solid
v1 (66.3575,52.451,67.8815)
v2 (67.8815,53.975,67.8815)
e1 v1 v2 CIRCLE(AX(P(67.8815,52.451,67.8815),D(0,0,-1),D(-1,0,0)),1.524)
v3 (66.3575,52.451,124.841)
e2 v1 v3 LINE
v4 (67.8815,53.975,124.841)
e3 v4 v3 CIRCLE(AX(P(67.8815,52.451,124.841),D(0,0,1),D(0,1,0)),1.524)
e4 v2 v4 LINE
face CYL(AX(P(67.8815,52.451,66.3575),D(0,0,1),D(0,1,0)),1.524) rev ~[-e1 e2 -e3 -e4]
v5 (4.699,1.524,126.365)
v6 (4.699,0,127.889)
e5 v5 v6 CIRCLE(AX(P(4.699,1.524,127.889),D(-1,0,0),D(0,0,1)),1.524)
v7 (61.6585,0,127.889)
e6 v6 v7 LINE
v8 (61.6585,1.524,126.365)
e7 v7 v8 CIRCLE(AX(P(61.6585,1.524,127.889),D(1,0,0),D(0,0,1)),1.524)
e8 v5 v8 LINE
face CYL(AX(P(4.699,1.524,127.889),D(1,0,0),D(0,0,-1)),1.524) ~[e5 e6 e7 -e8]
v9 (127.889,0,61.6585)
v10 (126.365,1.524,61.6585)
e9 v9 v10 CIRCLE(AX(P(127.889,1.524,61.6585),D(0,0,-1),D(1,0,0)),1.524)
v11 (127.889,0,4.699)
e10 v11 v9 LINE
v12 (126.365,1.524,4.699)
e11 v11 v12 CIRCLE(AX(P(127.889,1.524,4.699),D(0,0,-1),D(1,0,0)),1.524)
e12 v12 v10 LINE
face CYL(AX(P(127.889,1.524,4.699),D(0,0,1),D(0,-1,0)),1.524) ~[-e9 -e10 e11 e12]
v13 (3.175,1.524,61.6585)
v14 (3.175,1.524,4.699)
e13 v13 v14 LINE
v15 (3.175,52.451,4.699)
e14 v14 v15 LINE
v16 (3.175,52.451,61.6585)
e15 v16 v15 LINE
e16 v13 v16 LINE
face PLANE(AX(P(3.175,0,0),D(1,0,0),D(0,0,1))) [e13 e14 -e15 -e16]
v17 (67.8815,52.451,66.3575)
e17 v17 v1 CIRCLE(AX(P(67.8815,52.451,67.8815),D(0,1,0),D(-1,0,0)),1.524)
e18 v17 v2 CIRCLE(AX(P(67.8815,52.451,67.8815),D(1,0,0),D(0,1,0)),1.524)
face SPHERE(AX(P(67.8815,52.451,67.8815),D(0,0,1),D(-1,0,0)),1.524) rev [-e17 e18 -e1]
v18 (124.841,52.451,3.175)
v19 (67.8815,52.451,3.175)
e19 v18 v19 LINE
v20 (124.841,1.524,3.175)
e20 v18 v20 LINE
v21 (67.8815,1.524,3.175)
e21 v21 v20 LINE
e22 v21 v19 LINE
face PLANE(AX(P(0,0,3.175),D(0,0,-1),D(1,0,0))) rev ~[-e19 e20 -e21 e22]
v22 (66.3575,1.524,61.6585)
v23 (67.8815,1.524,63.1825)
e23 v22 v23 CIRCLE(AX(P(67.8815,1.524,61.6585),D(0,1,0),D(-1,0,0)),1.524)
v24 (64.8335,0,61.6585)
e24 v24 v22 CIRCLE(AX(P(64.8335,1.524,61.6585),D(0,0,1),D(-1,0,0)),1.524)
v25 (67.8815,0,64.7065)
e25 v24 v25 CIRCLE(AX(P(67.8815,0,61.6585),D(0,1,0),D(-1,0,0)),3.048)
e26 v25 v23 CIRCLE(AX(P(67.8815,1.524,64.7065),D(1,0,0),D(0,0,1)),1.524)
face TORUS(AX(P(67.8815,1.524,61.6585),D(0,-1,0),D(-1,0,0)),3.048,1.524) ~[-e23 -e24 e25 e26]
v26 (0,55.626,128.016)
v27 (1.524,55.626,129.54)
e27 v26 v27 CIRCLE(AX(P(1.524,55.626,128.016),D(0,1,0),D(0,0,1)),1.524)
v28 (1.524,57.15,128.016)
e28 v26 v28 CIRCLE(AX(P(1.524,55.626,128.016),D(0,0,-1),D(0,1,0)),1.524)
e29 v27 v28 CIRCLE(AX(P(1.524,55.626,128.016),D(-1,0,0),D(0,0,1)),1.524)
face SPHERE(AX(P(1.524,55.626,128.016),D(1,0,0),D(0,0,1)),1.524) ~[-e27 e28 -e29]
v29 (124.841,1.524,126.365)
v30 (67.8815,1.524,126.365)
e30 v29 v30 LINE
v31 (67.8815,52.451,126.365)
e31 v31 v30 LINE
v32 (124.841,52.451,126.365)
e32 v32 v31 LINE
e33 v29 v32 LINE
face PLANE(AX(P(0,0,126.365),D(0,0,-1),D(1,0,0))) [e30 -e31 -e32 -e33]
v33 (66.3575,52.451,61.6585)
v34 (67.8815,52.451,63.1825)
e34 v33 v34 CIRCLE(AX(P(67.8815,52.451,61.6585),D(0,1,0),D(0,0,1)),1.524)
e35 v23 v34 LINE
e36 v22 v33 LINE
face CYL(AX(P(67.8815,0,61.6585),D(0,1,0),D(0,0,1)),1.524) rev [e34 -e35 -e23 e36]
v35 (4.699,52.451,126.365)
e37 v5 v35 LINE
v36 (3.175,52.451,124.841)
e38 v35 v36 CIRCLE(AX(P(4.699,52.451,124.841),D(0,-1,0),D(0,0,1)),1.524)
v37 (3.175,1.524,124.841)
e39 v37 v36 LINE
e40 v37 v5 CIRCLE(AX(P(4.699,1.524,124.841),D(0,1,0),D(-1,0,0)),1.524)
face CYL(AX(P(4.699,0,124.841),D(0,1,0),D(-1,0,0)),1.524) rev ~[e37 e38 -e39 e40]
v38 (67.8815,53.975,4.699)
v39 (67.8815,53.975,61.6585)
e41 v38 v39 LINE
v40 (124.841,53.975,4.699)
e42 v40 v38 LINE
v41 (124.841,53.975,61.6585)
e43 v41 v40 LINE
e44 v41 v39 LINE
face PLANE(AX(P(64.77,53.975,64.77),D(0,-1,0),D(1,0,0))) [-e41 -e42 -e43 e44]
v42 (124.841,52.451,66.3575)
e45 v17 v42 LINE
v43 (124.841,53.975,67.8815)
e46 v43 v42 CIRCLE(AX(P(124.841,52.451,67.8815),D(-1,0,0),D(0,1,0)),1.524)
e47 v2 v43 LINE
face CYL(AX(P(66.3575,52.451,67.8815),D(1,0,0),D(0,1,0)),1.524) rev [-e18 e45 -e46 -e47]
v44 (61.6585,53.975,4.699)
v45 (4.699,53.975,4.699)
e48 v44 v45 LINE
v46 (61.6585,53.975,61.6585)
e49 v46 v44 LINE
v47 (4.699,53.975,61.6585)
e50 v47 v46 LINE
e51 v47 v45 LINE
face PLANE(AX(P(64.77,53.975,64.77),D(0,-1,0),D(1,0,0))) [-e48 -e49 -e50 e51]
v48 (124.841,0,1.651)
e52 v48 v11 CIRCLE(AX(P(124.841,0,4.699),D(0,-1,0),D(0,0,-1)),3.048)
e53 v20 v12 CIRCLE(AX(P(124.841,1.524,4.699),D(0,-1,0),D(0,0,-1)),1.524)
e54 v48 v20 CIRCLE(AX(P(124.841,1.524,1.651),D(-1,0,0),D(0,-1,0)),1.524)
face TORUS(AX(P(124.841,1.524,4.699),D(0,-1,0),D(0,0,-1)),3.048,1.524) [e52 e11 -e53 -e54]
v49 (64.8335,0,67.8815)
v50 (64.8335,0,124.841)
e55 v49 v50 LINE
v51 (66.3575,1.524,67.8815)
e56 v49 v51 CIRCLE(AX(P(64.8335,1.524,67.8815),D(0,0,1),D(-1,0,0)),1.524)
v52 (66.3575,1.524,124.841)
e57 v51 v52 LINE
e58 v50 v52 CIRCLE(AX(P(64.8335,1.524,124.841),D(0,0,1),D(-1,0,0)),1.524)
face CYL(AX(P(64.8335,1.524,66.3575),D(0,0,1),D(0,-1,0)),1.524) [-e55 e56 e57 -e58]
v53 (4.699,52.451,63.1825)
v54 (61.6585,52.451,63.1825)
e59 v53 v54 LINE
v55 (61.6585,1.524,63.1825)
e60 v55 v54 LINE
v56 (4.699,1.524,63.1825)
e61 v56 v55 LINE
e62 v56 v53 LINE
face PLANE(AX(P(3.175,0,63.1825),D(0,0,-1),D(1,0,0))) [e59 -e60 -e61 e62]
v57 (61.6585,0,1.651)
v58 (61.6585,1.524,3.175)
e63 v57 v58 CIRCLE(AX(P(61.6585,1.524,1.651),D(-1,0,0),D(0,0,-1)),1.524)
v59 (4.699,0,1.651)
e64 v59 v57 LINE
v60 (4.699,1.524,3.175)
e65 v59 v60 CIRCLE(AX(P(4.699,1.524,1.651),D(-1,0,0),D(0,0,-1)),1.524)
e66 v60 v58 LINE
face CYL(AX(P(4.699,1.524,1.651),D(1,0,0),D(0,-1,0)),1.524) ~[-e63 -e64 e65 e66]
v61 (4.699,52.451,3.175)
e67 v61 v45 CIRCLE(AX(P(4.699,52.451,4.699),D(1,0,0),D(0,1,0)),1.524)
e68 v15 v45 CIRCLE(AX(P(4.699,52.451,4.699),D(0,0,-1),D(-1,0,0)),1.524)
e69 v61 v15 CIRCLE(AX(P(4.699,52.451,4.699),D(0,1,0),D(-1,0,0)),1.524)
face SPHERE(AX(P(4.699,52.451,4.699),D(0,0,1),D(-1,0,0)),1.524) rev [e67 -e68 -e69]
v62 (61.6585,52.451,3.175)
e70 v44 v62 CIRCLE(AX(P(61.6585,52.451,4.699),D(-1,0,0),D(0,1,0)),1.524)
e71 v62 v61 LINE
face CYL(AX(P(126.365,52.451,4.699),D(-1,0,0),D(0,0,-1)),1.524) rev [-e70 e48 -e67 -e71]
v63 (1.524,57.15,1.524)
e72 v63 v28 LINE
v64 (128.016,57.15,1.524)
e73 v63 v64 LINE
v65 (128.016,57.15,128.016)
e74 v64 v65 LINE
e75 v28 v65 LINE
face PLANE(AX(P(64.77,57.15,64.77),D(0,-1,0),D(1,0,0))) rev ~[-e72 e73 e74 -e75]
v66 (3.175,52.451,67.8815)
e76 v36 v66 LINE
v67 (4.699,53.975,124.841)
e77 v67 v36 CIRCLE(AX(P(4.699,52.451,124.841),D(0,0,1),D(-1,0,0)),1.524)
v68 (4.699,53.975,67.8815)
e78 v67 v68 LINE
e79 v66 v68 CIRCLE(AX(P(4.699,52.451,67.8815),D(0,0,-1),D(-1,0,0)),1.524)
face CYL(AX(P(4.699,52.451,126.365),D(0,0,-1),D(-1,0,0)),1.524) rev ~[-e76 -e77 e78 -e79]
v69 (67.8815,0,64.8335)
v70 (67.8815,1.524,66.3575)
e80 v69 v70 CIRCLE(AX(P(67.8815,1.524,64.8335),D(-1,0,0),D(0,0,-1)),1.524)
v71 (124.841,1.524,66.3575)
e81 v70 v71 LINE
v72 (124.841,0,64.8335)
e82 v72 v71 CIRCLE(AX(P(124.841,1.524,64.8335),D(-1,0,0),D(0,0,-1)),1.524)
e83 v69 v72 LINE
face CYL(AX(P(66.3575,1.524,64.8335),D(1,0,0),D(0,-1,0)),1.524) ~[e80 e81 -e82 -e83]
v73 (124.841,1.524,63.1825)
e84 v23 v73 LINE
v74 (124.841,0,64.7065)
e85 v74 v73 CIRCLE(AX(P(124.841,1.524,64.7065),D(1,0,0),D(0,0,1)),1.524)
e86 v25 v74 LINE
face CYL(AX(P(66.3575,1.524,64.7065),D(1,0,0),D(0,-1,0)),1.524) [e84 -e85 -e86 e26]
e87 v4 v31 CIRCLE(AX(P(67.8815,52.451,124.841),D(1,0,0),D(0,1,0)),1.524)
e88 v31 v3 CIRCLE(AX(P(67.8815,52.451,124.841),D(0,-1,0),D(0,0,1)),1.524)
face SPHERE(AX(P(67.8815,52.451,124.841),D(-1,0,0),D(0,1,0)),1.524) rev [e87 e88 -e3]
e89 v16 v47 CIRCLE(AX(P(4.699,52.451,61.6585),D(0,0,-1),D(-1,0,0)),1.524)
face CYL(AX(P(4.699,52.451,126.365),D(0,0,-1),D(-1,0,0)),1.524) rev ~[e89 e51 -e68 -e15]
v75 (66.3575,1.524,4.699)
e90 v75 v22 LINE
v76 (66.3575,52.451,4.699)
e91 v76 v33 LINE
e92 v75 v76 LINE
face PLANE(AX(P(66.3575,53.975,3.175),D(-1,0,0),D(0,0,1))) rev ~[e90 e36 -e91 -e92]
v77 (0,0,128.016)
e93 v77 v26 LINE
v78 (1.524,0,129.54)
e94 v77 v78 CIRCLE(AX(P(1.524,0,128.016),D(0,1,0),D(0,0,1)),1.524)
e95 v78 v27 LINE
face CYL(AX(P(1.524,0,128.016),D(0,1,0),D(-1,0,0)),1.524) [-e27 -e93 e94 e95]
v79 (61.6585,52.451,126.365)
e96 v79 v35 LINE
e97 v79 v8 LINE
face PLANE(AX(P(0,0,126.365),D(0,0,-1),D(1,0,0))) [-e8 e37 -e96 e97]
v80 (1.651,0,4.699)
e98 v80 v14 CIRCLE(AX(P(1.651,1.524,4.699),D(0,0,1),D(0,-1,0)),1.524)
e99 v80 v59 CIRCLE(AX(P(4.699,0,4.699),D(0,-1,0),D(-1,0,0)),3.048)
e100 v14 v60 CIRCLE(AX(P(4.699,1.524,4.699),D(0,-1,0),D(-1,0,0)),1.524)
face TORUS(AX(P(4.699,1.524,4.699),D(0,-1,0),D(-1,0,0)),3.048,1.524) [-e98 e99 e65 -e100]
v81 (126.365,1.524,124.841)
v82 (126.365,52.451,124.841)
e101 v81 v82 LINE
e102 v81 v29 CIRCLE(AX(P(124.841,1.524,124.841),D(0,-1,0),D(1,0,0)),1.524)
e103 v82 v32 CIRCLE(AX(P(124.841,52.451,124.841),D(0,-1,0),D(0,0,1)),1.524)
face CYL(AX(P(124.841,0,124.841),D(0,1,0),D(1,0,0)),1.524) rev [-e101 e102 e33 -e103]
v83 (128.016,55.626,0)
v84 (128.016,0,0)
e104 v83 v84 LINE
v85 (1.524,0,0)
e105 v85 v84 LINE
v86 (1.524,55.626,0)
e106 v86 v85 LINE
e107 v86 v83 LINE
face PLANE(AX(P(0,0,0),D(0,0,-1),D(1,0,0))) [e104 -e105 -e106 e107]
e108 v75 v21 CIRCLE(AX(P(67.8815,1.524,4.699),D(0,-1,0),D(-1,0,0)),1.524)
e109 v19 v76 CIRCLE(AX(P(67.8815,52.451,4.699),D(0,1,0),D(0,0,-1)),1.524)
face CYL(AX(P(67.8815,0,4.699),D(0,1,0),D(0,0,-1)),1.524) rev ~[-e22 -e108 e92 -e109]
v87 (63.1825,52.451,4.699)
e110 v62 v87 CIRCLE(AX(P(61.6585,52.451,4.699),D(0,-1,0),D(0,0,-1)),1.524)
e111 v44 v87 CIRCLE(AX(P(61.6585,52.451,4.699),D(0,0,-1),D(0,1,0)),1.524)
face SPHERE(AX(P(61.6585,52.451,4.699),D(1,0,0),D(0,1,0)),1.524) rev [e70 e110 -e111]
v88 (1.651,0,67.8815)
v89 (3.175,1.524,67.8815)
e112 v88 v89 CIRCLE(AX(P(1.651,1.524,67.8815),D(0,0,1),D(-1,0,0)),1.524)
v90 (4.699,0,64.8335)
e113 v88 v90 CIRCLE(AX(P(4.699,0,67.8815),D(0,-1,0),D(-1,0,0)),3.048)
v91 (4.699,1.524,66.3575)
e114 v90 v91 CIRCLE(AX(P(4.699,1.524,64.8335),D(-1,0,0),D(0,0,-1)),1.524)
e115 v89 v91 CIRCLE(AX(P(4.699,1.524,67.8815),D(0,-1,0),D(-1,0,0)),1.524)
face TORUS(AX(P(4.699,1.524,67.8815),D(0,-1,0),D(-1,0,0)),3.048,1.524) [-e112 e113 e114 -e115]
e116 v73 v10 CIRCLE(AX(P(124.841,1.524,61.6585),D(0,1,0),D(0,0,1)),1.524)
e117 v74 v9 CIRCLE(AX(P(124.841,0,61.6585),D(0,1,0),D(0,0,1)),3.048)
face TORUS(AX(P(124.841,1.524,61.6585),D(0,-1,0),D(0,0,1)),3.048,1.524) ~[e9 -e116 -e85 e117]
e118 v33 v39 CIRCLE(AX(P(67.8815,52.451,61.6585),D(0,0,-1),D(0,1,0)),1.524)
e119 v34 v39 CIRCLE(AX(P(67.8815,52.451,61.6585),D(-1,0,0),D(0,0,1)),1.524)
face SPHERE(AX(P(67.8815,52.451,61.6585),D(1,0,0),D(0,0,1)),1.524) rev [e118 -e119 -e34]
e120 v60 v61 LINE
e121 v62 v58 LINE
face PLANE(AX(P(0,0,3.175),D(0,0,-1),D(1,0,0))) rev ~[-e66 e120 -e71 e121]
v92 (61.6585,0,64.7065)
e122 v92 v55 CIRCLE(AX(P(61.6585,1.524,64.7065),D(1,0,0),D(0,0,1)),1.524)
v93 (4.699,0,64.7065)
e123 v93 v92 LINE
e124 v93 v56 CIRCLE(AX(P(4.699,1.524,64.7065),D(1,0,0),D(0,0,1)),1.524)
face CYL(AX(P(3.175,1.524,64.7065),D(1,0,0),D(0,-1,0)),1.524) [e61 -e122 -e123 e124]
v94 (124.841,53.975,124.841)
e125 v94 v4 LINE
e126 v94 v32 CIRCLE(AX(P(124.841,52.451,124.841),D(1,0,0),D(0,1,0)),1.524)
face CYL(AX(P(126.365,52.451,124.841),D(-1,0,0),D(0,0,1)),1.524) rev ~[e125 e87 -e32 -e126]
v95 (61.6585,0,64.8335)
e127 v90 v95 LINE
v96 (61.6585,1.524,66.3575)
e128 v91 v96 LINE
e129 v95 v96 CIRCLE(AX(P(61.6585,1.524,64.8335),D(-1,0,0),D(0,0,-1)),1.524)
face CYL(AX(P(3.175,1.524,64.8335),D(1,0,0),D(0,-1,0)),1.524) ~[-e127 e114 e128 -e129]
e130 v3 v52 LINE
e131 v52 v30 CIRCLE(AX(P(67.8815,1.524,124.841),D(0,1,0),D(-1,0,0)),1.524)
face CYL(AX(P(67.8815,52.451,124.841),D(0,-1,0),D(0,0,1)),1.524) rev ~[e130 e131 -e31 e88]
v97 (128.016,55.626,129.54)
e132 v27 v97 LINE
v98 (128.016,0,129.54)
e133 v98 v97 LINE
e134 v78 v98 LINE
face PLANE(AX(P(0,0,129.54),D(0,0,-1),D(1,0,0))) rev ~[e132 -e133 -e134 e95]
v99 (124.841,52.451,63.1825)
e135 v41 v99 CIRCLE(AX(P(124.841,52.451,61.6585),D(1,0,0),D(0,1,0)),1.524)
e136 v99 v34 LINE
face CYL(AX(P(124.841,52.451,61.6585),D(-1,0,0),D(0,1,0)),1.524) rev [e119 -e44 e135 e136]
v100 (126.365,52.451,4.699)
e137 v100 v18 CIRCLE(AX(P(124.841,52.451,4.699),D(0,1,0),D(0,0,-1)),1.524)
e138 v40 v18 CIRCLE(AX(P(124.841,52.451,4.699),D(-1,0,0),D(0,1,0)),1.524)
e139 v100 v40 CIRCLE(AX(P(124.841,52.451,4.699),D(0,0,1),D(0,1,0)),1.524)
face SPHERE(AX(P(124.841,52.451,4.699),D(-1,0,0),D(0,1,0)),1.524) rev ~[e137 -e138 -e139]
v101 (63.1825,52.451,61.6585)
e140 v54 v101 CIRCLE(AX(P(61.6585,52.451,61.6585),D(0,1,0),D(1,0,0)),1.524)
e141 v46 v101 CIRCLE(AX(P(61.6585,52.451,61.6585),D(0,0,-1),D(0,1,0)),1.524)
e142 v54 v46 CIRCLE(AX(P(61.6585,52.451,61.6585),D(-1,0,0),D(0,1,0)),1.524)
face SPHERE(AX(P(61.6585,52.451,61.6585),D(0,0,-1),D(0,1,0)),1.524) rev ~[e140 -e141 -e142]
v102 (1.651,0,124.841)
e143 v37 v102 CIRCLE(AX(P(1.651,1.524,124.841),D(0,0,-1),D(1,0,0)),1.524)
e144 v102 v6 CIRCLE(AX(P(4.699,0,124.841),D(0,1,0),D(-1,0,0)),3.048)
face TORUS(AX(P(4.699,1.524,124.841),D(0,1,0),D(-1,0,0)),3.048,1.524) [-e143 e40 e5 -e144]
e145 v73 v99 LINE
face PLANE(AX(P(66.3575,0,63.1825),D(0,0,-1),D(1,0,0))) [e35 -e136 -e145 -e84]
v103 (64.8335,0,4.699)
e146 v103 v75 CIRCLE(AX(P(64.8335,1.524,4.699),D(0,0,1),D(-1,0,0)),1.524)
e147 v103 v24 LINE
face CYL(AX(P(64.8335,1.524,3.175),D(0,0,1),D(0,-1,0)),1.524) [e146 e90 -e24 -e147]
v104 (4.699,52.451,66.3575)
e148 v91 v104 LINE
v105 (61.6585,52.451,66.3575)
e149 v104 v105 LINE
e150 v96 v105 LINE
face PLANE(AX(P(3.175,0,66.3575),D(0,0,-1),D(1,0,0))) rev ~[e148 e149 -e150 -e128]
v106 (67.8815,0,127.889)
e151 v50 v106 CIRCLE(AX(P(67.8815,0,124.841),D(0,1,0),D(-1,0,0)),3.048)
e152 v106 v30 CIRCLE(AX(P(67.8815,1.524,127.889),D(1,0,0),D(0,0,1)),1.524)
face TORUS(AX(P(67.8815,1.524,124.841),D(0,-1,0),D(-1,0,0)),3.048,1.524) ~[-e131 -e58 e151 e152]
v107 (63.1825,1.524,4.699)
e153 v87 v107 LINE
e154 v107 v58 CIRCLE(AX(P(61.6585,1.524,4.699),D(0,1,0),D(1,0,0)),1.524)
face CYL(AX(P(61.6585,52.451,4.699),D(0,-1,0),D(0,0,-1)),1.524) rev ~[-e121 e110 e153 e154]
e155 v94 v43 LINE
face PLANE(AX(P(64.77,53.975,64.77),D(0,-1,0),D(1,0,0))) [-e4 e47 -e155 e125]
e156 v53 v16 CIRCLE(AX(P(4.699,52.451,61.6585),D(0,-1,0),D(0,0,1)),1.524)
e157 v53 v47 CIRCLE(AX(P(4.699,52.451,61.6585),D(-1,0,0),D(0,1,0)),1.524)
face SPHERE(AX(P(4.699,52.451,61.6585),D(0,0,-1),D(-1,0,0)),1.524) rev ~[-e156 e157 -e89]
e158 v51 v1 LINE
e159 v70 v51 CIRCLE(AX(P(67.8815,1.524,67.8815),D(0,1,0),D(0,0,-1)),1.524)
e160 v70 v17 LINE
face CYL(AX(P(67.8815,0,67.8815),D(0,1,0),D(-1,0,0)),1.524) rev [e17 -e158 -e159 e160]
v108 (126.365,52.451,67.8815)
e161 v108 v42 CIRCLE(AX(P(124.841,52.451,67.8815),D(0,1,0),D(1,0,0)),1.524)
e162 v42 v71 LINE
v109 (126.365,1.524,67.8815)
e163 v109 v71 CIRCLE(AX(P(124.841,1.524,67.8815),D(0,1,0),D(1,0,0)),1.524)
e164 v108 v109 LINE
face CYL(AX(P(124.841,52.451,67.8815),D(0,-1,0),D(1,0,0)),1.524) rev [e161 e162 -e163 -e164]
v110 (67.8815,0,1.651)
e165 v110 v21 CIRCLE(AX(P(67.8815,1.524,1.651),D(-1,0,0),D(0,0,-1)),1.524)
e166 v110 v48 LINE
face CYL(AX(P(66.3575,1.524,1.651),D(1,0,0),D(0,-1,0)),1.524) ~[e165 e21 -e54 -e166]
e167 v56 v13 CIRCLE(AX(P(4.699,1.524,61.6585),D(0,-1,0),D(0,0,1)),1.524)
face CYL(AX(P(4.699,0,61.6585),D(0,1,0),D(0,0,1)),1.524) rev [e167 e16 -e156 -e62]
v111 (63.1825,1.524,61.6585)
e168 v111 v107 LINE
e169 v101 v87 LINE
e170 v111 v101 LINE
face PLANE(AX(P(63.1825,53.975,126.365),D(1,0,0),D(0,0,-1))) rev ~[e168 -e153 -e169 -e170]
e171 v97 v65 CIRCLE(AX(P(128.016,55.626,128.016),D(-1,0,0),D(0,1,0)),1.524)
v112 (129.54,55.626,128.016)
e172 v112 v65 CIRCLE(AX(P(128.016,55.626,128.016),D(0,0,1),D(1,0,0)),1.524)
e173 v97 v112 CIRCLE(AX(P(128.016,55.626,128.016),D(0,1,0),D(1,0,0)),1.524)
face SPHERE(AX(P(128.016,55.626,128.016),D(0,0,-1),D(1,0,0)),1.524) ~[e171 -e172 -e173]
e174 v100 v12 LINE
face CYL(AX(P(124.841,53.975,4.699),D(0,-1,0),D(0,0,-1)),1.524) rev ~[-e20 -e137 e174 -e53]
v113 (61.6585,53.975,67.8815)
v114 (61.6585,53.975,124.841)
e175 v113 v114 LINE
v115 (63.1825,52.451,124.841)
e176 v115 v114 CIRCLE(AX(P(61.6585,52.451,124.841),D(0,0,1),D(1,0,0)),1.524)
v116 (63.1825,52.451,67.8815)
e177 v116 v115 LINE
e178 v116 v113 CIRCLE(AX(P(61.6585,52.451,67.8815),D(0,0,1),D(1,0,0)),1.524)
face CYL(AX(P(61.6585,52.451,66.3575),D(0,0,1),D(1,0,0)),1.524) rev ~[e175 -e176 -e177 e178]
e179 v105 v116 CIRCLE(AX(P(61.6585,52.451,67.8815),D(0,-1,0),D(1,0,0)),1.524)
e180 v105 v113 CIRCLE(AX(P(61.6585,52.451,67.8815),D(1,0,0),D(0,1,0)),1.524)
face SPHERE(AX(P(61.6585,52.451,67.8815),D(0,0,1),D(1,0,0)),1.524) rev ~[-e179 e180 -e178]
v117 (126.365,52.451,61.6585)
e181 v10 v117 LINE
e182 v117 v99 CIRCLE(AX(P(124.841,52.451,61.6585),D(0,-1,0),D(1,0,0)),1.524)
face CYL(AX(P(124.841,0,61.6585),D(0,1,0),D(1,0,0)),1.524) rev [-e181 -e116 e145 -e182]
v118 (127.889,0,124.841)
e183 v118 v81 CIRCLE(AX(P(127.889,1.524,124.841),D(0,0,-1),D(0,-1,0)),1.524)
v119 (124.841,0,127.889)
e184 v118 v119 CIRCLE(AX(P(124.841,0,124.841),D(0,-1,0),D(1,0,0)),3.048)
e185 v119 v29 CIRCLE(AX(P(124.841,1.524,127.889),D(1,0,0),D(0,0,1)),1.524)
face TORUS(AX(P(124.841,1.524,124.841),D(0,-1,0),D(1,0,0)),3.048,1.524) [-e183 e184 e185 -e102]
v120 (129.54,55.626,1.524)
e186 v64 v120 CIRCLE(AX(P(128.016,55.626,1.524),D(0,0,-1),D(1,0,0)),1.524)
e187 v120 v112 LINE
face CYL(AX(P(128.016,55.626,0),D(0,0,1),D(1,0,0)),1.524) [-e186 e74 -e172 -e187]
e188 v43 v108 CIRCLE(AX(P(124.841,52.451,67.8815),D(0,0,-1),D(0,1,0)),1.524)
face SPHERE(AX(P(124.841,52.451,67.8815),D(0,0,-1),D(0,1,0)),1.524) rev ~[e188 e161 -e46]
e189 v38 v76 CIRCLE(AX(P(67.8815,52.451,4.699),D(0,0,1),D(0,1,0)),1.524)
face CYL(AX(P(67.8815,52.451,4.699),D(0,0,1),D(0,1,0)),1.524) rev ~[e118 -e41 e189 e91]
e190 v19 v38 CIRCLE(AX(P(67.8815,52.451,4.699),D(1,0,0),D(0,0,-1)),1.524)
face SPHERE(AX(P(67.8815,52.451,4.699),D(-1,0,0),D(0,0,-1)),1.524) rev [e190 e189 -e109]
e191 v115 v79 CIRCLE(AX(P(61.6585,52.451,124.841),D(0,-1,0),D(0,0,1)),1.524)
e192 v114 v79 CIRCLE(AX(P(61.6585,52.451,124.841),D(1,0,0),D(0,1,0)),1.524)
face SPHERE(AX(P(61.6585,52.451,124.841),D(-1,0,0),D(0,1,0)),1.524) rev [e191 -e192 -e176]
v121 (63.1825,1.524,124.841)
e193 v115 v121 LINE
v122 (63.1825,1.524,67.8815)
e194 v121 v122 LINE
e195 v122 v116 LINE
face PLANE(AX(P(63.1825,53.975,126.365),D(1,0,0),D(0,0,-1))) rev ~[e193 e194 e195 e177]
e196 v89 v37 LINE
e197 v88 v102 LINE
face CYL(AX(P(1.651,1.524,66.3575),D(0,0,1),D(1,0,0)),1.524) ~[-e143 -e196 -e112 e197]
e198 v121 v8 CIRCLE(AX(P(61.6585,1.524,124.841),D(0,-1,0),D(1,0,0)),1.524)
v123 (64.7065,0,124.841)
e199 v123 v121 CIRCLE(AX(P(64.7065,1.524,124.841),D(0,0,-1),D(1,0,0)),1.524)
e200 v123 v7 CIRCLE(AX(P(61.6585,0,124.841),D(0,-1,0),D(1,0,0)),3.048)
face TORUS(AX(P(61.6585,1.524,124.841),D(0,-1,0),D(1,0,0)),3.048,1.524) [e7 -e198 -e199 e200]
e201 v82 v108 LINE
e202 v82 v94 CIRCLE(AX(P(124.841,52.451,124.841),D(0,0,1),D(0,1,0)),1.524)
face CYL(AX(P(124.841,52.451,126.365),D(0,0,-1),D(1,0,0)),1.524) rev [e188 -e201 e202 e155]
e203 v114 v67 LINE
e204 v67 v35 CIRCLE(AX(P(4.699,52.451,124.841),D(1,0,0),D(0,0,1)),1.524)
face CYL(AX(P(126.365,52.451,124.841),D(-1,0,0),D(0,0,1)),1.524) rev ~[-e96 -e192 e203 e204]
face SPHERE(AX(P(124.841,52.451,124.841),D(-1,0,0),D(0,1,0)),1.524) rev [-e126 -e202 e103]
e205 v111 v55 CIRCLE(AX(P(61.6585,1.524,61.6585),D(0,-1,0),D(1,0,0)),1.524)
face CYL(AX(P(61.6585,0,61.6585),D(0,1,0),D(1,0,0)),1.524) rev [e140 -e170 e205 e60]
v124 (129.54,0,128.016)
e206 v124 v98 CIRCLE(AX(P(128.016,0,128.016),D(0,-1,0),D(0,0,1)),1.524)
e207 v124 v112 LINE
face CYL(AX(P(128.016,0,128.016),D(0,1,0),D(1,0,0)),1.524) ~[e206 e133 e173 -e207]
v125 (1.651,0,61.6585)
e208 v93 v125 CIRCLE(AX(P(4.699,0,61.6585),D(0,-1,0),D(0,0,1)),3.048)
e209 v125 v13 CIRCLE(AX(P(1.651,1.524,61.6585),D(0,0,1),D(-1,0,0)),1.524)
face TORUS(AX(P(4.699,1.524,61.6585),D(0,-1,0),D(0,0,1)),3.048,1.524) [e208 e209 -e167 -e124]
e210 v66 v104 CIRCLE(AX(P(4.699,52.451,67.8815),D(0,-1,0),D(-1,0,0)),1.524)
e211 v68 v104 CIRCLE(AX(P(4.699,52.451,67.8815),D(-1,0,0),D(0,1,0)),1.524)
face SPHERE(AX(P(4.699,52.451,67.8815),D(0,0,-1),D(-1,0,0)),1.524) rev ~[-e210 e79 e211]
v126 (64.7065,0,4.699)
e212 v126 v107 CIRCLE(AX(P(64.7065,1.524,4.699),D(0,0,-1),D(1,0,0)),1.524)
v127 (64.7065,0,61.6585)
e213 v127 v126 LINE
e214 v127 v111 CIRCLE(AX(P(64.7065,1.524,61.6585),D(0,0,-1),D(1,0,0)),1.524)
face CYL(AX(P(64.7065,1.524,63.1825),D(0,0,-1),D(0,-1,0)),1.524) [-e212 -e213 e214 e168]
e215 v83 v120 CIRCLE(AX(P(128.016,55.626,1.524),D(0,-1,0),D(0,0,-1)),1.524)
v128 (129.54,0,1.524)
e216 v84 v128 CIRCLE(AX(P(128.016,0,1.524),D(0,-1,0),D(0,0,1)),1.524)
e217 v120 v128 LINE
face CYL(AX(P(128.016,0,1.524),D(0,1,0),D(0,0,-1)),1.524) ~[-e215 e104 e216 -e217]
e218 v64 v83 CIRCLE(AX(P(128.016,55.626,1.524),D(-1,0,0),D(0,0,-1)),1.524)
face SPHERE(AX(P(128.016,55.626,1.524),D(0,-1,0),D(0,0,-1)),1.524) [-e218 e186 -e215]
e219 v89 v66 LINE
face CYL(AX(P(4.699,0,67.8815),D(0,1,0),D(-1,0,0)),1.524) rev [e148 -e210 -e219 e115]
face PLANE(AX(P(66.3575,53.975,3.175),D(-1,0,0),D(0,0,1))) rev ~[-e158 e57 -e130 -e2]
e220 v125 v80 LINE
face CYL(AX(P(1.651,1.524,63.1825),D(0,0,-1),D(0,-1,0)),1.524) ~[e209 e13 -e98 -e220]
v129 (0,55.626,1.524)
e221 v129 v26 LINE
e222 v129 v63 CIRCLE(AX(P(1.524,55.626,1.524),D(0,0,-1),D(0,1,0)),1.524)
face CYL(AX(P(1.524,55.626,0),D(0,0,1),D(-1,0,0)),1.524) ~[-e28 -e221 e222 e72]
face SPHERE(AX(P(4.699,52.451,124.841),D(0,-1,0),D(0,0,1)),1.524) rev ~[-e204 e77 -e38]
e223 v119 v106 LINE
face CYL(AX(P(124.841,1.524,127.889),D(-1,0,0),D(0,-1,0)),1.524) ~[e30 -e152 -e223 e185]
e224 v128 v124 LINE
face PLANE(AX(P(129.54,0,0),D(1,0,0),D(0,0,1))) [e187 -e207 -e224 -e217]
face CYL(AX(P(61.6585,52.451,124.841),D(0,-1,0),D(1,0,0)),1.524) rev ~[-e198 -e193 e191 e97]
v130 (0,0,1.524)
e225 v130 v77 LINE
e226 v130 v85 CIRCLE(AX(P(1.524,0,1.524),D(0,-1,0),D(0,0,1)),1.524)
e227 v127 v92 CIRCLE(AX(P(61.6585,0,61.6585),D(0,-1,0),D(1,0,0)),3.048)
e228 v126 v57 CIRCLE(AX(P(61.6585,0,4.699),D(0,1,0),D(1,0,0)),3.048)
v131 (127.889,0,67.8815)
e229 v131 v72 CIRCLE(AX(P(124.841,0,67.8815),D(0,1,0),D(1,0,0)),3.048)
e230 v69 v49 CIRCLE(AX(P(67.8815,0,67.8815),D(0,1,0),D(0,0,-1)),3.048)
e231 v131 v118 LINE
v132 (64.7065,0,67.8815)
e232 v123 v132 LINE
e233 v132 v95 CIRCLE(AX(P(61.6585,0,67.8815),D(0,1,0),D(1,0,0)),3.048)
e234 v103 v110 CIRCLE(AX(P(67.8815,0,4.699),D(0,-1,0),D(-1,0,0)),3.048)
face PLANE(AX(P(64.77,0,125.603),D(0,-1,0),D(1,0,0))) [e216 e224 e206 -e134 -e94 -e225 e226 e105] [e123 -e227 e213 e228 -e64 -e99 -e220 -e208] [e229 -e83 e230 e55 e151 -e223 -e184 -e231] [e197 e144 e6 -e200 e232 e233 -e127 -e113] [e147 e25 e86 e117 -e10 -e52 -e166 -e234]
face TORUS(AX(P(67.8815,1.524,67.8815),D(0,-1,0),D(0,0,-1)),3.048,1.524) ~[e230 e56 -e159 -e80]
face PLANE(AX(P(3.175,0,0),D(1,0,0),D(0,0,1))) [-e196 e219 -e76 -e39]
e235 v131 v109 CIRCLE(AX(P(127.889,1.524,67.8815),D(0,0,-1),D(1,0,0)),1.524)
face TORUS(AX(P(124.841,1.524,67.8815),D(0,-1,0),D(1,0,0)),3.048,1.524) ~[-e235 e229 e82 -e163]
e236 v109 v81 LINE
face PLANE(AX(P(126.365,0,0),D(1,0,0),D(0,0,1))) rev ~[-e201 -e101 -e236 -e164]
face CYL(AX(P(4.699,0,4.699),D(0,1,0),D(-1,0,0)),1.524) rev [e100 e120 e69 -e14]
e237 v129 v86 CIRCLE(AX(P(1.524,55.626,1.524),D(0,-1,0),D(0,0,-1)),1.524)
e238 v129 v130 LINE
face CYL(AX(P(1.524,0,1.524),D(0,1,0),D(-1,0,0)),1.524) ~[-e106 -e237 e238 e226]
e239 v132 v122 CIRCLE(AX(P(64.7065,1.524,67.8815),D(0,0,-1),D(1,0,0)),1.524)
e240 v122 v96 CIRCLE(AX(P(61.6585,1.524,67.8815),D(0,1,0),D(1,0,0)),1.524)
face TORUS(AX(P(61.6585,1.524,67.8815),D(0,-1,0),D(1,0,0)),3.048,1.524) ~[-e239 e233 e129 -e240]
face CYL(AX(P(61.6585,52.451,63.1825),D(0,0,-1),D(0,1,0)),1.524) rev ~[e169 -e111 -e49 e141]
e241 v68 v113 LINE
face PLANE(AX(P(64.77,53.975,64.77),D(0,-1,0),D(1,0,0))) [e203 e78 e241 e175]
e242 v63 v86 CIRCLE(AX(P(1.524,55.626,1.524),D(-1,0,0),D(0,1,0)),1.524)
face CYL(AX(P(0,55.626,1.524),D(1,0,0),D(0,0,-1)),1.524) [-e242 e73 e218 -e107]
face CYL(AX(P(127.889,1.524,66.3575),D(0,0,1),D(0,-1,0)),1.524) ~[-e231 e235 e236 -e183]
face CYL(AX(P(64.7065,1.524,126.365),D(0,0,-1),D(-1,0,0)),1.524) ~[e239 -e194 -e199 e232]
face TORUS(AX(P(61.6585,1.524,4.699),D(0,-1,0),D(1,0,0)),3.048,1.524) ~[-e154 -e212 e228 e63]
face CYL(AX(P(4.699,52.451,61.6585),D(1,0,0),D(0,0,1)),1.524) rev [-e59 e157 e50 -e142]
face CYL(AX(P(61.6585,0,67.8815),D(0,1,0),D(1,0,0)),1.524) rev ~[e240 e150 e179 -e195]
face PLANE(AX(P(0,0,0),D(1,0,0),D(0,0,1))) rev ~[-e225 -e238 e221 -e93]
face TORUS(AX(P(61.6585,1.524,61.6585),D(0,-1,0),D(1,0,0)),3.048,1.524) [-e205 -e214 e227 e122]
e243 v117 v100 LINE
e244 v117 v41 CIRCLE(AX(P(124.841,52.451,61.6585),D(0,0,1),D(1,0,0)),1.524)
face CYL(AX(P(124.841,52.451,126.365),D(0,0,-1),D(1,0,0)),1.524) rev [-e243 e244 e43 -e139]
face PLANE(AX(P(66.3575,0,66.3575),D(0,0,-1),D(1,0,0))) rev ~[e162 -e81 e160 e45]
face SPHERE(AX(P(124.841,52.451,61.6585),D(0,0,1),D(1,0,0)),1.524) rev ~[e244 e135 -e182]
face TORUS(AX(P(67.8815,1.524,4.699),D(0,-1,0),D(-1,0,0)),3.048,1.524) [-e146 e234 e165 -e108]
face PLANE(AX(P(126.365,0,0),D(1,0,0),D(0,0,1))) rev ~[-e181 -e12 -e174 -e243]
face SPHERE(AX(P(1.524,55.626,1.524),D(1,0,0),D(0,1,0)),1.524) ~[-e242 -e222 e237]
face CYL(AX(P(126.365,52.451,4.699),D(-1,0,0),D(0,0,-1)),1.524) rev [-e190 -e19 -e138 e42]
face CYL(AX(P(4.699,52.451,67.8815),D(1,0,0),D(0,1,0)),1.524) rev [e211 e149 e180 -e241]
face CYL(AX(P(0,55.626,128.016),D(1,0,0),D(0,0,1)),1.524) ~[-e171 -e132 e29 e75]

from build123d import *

# Parameters (mm, degrees)
F0_W     = 129.54
F0_H     = 129.54
F1_DEPTH = 57.15
F2_T     = -3.175
F3_R     = 1.524
F4_R     = 1.524
F5_W     = 3.175
F5_H     = 1.524
F5_H_2   = 120.142
F6_DEPTH = 53.975
F7_W     = 60.0075
F7_H     = 3.175
F8_DEPTH = 53.975
F9_R     = 1.524


with BuildPart() as f1:
    # F0 (on Front) → F1 (new body)
    with BuildSketch(Plane.XZ):
        with Locations((64.77, 64.77)):
            Rectangle(F0_W, F0_H)
    extrude(amount=-F1_DEPTH)

    # F2
    f2_openings = [f1.faces().sort_by_distance(p)[0] for p in [
        (64.77, 0, 64.77),
    ]]
    offset(amount=F2_T, openings=f2_openings)

    # F3
    f3_edges = [f1.edges().sort_by_distance(p)[0] for p in [
        (3.175, 26.9875, 126.365),
        (64.77, 53.975, 126.365),
        (3.175, 53.975, 64.77),
        (3.175, 26.9875, 3.175),
        (64.77, 53.975, 3.175),
        (126.365, 53.975, 64.77),
        (126.365, 26.9875, 126.365),
        (126.365, 26.9875, 3.175),
    ]]
    fillet(f3_edges, radius=F3_R)

    # F4
    f4_edges = [f1.edges().sort_by_distance(p)[0] for p in [
        (129.54, 28.575, 0),
        (64.77, 57.15, 0),
        (129.54, 57.15, 64.77),
        (129.54, 28.575, 129.54),
        (64.77, 57.15, 129.54),
        (0, 28.575, 129.54),
        (0, 57.15, 64.77),
        (0, 28.575, 0),
    ]]
    fillet(f4_edges, radius=F4_R)

    # F5 (on face) → F6 (join)
    with BuildSketch(Plane.XZ.offset(-53.975)):
        with Locations((64.77, 125.603)):
            Rectangle(F5_W, F5_H)
        with Locations((64.77, 64.77)):
            Rectangle(F5_W, F5_H_2)
        with Locations((64.77, 3.937)):
            Rectangle(F5_W, F5_H)
    extrude(amount=F6_DEPTH)

    # F7 (on face) → F8 (join)
    with BuildSketch(Plane.XZ):
        with BuildLine():
            ThreePointArc((1.524, 129.54), (0.4463692655, 129.0936307345), (0, 128.016))
            Line((0, 128.016), (0, 1.524))
            ThreePointArc((0, 1.524), (0.4463692655, 0.4463692655), (1.524, 0))
            Line((1.524, 0), (128.016, 0))
            ThreePointArc((128.016, 0), (129.0936307345, 0.4463692655), (129.54, 1.524))
            Line((129.54, 1.524), (129.54, 128.016))
            ThreePointArc((129.54, 128.016), (129.0936307345, 129.0936307345), (128.016, 129.54))
            Line((128.016, 129.54), (1.524, 129.54))
        make_face()
        with BuildLine():
            Line((3.175, 4.699), (3.175, 63.1825))
            Line((3.175, 63.1825), (3.175, 66.3575))
            Line((3.175, 66.3575), (3.175, 124.841))
            ThreePointArc((3.175, 124.841), (3.6213692655, 125.9186307345), (4.699, 126.365))
            Line((4.699, 126.365), (63.1825, 126.365))
            Line((63.1825, 126.365), (63.1825, 66.3575))
            Line((63.1825, 66.3575), (66.3575, 66.3575))
            Line((66.3575, 66.3575), (66.3575, 126.365))
            Line((66.3575, 126.365), (124.841, 126.365))
            ThreePointArc((124.841, 126.365), (125.9186307345, 125.9186307345), (126.365, 124.841))
            Line((126.365, 124.841), (126.365, 66.3575))
            Line((126.365, 66.3575), (126.365, 63.1825))
            Line((126.365, 63.1825), (126.365, 4.699))
            ThreePointArc((126.365, 4.699), (125.9186307345, 3.6213692655), (124.841, 3.175))
            Line((124.841, 3.175), (66.3575, 3.175))
            Line((66.3575, 3.175), (66.3575, 63.1825))
            Line((66.3575, 63.1825), (63.1825, 63.1825))
            Line((63.1825, 63.1825), (63.1825, 3.175))
            Line((63.1825, 3.175), (4.699, 3.175))
            ThreePointArc((4.699, 3.175), (3.6213692655, 3.6213692655), (3.175, 4.699))
        make_face(mode=Mode.SUBTRACT)
        with Locations((33.17875, 64.77)):
            Rectangle(F7_W, F7_H)
        with Locations((96.36125, 64.77)):
            Rectangle(F7_W, F7_H)
    extrude(amount=-F8_DEPTH)

    # F9
    f9_edges = [f1.edges().sort_by_distance(p)[0] for p in [
        (66.3575, 53.975, 95.59925),
        (66.3575, 53.528631, 125.918631),
        (66.3575, 26.2255, 126.365),
        (66.3575, 0, 96.36125),
        (66.3575, 26.9875, 66.3575),
        (96.36125, 0, 66.3575),
        (95.59925, 53.975, 66.3575),
        (125.918631, 53.528631, 66.3575),
        (126.365, 26.2255, 66.3575),
        (126.365, 0, 95.59925),
        (126.365, 26.2255, 124.841),
        (126.365, 52.451, 95.59925),
        (126.365, 0, 33.94075),
        (126.365, 26.2255, 63.1825),
        (126.365, 52.451, 33.94075),
        (126.365, 26.2255, 4.699),
        (96.36125, 0, 63.1825),
        (125.918631, 53.528631, 63.1825),
        (95.59925, 53.975, 63.1825),
        (66.3575, 26.9875, 63.1825),
        (66.3575, 53.975, 33.94075),
        (66.3575, 0, 33.17875),
        (66.3575, 26.2255, 3.175),
        (66.3575, 53.528631, 3.621369),
        (95.59925, 0, 3.175),
        (124.841, 26.2255, 3.175),
        (95.59925, 52.451, 3.175),
        (33.94075, 0, 3.175),
        (63.1825, 26.2255, 3.175),
        (33.94075, 52.451, 3.175),
        (4.699, 26.2255, 3.175),
        (3.175, 0, 33.94075),
        (3.175, 26.2255, 4.699),
        (3.175, 52.451, 33.94075),
        (3.175, 26.2255, 63.1825),
        (33.17875, 0, 63.1825),
        (63.1825, 26.9875, 63.1825),
        (33.94075, 53.975, 63.1825),
        (3.621369, 53.528631, 63.1825),
        (63.1825, 53.975, 33.94075),
        (63.1825, 53.528631, 3.621369),
        (63.1825, 0, 33.17875),
        (95.59925, 0, 126.365),
        (95.59925, 52.451, 126.365),
        (124.841, 26.2255, 126.365),
        (33.94075, 0, 126.365),
        (4.699, 26.2255, 126.365),
        (33.94075, 52.451, 126.365),
        (63.1825, 26.2255, 126.365),
        (63.1825, 53.975, 95.59925),
        (63.1825, 26.9875, 66.3575),
        (63.1825, 0, 96.36125),
        (63.1825, 53.528631, 125.918631),
        (33.17875, 0, 66.3575),
        (3.175, 26.2255, 66.3575),
        (3.621369, 53.528631, 66.3575),
        (33.94075, 53.975, 66.3575),
        (3.175, 0, 95.59925),
        (3.175, 52.451, 95.59925),
        (3.175, 26.2255, 124.841),
        (3.621369, 0, 125.918631),
        (3.621369, 0, 3.621369),
        (125.918631, 0, 3.621369),
        (125.918631, 0, 125.918631),
    ]]
    fillet(f9_edges, radius=F9_R)


solid = f1.part
